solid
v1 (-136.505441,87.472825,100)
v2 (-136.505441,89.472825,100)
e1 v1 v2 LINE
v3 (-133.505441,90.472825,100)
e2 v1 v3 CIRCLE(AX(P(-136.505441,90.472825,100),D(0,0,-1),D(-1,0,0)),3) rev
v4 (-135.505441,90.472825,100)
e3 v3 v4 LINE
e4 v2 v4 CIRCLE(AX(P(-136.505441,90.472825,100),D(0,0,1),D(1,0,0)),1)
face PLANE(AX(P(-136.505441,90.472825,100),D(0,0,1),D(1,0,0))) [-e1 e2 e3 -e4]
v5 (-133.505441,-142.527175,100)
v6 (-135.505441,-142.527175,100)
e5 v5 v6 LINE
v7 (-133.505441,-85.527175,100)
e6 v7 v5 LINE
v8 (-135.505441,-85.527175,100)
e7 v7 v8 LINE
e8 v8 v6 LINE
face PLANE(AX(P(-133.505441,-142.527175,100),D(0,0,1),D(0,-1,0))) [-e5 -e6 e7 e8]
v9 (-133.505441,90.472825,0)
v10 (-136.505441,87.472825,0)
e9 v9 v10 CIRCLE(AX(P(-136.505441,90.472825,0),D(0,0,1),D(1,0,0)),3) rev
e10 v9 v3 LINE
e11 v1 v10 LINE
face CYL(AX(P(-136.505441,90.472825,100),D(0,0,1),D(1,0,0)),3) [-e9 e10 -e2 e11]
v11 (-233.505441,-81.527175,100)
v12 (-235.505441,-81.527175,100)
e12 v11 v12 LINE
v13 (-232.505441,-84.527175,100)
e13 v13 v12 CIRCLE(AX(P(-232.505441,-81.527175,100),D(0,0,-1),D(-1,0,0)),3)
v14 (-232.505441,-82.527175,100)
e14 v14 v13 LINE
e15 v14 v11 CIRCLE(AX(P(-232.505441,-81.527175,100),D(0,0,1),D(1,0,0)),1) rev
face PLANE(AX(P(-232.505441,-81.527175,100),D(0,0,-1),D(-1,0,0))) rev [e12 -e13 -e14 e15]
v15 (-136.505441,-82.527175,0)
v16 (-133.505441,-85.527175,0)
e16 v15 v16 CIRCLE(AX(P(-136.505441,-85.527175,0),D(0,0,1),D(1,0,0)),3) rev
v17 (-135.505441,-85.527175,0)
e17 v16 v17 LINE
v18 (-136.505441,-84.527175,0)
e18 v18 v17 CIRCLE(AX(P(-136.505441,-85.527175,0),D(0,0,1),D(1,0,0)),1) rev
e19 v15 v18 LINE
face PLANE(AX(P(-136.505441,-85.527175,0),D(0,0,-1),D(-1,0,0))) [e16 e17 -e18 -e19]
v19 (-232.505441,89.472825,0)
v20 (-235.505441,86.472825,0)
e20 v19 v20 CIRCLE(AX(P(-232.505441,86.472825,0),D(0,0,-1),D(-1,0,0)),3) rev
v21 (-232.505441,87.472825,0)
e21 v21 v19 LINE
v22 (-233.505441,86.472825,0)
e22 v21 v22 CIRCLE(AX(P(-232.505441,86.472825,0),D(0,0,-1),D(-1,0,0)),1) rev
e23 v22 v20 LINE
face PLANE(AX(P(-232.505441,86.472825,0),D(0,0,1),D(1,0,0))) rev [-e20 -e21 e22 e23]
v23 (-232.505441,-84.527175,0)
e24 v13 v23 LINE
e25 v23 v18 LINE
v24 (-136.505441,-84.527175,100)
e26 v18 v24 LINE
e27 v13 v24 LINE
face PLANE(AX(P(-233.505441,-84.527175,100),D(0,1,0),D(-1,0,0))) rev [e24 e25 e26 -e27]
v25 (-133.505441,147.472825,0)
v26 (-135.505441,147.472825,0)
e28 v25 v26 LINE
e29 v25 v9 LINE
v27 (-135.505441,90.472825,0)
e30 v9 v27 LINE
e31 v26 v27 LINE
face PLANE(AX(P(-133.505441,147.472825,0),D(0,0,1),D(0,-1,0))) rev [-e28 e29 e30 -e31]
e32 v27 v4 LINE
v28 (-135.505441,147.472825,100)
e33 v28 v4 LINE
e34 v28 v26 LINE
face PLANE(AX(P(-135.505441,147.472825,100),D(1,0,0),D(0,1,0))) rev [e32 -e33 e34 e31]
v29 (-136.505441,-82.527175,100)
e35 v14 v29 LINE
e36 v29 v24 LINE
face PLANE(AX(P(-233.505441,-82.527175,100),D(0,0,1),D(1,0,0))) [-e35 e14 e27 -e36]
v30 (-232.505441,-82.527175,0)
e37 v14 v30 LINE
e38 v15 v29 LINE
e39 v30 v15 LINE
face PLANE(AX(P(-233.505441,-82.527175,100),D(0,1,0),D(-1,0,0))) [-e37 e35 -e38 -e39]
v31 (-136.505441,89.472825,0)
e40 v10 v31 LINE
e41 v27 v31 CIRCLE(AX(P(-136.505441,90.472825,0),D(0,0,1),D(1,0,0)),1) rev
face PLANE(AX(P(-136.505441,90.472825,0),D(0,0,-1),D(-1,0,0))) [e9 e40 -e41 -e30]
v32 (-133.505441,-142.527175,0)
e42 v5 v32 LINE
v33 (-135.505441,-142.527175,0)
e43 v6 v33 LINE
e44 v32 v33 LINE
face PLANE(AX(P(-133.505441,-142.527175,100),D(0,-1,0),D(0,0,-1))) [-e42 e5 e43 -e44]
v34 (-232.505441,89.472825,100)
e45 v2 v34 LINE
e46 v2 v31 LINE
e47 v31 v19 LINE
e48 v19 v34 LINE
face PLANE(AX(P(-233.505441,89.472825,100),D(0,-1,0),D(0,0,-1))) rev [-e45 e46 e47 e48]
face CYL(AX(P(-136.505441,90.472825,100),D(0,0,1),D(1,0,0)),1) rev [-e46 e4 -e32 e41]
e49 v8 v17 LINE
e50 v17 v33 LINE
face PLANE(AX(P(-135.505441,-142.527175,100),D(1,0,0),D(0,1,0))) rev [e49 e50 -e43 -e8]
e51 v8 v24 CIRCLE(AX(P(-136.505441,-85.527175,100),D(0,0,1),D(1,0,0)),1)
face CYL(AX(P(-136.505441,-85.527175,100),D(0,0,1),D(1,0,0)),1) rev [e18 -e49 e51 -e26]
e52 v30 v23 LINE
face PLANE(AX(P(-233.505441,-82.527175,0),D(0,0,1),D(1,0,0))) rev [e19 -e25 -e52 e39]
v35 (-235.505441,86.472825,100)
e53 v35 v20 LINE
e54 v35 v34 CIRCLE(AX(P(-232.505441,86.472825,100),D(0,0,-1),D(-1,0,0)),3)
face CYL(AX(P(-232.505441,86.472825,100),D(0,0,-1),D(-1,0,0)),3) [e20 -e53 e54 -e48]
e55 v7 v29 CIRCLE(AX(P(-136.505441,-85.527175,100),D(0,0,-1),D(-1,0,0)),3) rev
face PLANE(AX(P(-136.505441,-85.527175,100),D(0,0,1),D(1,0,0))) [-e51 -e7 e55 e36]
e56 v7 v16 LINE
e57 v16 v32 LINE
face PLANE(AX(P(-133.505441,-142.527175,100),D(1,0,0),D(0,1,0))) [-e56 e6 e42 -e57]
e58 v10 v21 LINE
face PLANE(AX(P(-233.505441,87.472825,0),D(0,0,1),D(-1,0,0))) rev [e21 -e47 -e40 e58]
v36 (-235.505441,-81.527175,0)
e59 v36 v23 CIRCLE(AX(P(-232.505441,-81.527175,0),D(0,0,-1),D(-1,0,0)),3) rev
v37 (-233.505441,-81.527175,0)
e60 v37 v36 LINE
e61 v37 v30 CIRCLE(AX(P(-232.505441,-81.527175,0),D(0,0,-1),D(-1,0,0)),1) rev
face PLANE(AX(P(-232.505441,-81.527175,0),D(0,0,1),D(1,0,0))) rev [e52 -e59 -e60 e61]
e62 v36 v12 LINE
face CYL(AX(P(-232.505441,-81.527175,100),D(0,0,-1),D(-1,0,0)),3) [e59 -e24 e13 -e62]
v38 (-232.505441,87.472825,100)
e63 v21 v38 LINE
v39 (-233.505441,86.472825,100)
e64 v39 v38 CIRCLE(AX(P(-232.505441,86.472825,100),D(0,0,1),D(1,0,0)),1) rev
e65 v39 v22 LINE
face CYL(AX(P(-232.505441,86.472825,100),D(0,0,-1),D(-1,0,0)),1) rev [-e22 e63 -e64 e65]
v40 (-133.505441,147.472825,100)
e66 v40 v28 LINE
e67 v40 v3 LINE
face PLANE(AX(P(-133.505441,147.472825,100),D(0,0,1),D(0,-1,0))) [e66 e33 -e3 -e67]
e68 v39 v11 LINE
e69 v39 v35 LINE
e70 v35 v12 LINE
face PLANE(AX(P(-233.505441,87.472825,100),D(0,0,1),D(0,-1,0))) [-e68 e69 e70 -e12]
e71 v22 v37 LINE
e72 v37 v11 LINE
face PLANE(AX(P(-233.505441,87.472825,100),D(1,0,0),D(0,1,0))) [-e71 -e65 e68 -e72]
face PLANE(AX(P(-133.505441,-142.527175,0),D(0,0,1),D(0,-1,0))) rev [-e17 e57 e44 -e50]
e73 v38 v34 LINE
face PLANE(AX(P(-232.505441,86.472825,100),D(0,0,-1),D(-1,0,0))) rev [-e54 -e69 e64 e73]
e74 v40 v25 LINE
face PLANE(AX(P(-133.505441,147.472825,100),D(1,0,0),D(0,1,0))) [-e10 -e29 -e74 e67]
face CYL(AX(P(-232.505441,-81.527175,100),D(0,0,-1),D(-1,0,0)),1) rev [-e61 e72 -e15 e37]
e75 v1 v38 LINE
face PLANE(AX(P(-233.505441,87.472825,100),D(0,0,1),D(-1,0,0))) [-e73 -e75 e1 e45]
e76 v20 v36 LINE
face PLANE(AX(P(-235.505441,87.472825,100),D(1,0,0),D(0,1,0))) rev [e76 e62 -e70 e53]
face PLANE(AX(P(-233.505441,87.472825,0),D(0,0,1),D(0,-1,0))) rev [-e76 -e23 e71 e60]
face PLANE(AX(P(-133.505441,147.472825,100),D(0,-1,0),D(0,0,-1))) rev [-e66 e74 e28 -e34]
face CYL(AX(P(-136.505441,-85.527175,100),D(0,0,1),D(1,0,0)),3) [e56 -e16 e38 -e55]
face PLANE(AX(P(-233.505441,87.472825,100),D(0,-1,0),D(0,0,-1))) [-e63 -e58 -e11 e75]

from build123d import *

# Parameters (mm, degrees)
EXTRU_MINCE1_DEPTH        = 100
CONVERTIR_VOLUME1_DEPTH   = 100
CONVERTIR_VOLUME1_2_DEPTH = 100


# Read off the part's stored shape, not the designer's step: Convertir-Volume1
with BuildPart() as part:
    # Esquisse1 → Extru.-Mince1 (new body)
    with BuildSketch(Plane.XY):
        Polygon((-133.505441468, 147.472825463), (-133.505441468, 87.472825463), (-233.505441468, 87.472825463), (-233.505441468, -82.527174537), (-133.505441468, -82.527174537), (-133.505441468, -142.527174537), (-123.505441468, -142.527174537), (-123.505441468, -72.527174537), (-223.505441468, -72.527174537), (-223.505441468, 77.472825463), (-123.505441468, 77.472825463), (-123.505441468, 147.472825463), align=None)
    extrude(amount=EXTRU_MINCE1_DEPTH)

    # Convertir-Volume1 outline → Convertir-Volume1 (cut)
    with BuildSketch(Plane.XY):
        with BuildLine():
            Line((-123.505441468, 147.472825463), (-133.505441468, 147.472825463))
            Line((-133.505441468, 147.472825463), (-133.505441468, 87.472825463))
            Line((-133.505441468, 87.472825463), (-232.505441468, 87.472825463))
            ThreePointArc((-232.505441468, 87.472825463), (-233.212548249, 87.179932244), (-233.505441468, 86.472825463))
            Line((-233.505441468, 86.472825463), (-233.505441468, -81.527174537))
            ThreePointArc((-233.505441468, -81.527174537), (-233.212548249, -82.234281318), (-232.505441468, -82.527174537))
            Line((-232.505441468, -82.527174537), (-133.505441468, -82.527174537))
            Line((-133.505441468, -82.527174537), (-133.505441468, -142.527174537))
            Line((-133.505441468, -142.527174537), (-123.505441468, -142.527174537))
            Line((-123.505441468, -142.527174537), (-123.505441468, -72.527174537))
            Line((-123.505441468, -72.527174537), (-223.505441468, -72.527174537))
            Line((-223.505441468, -72.527174537), (-223.505441468, 77.472825463))
            Line((-223.505441468, 77.472825463), (-123.505441468, 77.472825463))
            Line((-123.505441468, 77.472825463), (-123.505441468, 147.472825463))
        make_face()
    extrude(amount=CONVERTIR_VOLUME1_DEPTH, mode=Mode.SUBTRACT)

    # Convertir-Volume1 2 outline → Convertir-Volume1 2 (add)
    with BuildSketch(Plane.XY):
        with BuildLine():
            Line((-133.505441468, 147.472825463), (-135.505441468, 147.472825463))
            Line((-135.505441468, 147.472825463), (-135.505441468, 90.472825463))
            ThreePointArc((-135.505441468, 90.472825463), (-135.798334686, 89.765718682), (-136.505441468, 89.472825463))
            Line((-136.505441468, 89.472825463), (-232.505441468, 89.472825463))
            ThreePointArc((-232.505441468, 89.472825463), (-234.626761811, 88.594145807), (-235.505441468, 86.472825463))
            Line((-235.505441468, 86.472825463), (-235.505441468, -81.527174537))
            ThreePointArc((-235.505441468, -81.527174537), (-234.626761811, -83.64849488), (-232.505441468, -84.527174537))
            Line((-232.505441468, -84.527174537), (-136.505441468, -84.527174537))
            ThreePointArc((-136.505441468, -84.527174537), (-135.798334686, -84.820067756), (-135.505441468, -85.527174537))
            Line((-135.505441468, -85.527174537), (-135.505441468, -142.527174537))
            Line((-135.505441468, -142.527174537), (-133.505441468, -142.527174537))
            Line((-133.505441468, -142.527174537), (-133.505441468, -85.527174537))
            ThreePointArc((-133.505441468, -85.527174537), (-134.384121124, -83.405854193), (-136.505441468, -82.527174537))
            Line((-136.505441468, -82.527174537), (-233.505441468, -82.527174537))
            Line((-233.505441468, -82.527174537), (-233.505441468, 87.472825463))
            Line((-233.505441468, 87.472825463), (-136.505441468, 87.472825463))
            ThreePointArc((-136.505441468, 87.472825463), (-134.384121124, 88.351505119), (-133.505441468, 90.472825463))
            Line((-133.505441468, 90.472825463), (-133.505441468, 147.472825463))
        make_face()
    extrude(amount=CONVERTIR_VOLUME1_2_DEPTH)


solid = part.part
